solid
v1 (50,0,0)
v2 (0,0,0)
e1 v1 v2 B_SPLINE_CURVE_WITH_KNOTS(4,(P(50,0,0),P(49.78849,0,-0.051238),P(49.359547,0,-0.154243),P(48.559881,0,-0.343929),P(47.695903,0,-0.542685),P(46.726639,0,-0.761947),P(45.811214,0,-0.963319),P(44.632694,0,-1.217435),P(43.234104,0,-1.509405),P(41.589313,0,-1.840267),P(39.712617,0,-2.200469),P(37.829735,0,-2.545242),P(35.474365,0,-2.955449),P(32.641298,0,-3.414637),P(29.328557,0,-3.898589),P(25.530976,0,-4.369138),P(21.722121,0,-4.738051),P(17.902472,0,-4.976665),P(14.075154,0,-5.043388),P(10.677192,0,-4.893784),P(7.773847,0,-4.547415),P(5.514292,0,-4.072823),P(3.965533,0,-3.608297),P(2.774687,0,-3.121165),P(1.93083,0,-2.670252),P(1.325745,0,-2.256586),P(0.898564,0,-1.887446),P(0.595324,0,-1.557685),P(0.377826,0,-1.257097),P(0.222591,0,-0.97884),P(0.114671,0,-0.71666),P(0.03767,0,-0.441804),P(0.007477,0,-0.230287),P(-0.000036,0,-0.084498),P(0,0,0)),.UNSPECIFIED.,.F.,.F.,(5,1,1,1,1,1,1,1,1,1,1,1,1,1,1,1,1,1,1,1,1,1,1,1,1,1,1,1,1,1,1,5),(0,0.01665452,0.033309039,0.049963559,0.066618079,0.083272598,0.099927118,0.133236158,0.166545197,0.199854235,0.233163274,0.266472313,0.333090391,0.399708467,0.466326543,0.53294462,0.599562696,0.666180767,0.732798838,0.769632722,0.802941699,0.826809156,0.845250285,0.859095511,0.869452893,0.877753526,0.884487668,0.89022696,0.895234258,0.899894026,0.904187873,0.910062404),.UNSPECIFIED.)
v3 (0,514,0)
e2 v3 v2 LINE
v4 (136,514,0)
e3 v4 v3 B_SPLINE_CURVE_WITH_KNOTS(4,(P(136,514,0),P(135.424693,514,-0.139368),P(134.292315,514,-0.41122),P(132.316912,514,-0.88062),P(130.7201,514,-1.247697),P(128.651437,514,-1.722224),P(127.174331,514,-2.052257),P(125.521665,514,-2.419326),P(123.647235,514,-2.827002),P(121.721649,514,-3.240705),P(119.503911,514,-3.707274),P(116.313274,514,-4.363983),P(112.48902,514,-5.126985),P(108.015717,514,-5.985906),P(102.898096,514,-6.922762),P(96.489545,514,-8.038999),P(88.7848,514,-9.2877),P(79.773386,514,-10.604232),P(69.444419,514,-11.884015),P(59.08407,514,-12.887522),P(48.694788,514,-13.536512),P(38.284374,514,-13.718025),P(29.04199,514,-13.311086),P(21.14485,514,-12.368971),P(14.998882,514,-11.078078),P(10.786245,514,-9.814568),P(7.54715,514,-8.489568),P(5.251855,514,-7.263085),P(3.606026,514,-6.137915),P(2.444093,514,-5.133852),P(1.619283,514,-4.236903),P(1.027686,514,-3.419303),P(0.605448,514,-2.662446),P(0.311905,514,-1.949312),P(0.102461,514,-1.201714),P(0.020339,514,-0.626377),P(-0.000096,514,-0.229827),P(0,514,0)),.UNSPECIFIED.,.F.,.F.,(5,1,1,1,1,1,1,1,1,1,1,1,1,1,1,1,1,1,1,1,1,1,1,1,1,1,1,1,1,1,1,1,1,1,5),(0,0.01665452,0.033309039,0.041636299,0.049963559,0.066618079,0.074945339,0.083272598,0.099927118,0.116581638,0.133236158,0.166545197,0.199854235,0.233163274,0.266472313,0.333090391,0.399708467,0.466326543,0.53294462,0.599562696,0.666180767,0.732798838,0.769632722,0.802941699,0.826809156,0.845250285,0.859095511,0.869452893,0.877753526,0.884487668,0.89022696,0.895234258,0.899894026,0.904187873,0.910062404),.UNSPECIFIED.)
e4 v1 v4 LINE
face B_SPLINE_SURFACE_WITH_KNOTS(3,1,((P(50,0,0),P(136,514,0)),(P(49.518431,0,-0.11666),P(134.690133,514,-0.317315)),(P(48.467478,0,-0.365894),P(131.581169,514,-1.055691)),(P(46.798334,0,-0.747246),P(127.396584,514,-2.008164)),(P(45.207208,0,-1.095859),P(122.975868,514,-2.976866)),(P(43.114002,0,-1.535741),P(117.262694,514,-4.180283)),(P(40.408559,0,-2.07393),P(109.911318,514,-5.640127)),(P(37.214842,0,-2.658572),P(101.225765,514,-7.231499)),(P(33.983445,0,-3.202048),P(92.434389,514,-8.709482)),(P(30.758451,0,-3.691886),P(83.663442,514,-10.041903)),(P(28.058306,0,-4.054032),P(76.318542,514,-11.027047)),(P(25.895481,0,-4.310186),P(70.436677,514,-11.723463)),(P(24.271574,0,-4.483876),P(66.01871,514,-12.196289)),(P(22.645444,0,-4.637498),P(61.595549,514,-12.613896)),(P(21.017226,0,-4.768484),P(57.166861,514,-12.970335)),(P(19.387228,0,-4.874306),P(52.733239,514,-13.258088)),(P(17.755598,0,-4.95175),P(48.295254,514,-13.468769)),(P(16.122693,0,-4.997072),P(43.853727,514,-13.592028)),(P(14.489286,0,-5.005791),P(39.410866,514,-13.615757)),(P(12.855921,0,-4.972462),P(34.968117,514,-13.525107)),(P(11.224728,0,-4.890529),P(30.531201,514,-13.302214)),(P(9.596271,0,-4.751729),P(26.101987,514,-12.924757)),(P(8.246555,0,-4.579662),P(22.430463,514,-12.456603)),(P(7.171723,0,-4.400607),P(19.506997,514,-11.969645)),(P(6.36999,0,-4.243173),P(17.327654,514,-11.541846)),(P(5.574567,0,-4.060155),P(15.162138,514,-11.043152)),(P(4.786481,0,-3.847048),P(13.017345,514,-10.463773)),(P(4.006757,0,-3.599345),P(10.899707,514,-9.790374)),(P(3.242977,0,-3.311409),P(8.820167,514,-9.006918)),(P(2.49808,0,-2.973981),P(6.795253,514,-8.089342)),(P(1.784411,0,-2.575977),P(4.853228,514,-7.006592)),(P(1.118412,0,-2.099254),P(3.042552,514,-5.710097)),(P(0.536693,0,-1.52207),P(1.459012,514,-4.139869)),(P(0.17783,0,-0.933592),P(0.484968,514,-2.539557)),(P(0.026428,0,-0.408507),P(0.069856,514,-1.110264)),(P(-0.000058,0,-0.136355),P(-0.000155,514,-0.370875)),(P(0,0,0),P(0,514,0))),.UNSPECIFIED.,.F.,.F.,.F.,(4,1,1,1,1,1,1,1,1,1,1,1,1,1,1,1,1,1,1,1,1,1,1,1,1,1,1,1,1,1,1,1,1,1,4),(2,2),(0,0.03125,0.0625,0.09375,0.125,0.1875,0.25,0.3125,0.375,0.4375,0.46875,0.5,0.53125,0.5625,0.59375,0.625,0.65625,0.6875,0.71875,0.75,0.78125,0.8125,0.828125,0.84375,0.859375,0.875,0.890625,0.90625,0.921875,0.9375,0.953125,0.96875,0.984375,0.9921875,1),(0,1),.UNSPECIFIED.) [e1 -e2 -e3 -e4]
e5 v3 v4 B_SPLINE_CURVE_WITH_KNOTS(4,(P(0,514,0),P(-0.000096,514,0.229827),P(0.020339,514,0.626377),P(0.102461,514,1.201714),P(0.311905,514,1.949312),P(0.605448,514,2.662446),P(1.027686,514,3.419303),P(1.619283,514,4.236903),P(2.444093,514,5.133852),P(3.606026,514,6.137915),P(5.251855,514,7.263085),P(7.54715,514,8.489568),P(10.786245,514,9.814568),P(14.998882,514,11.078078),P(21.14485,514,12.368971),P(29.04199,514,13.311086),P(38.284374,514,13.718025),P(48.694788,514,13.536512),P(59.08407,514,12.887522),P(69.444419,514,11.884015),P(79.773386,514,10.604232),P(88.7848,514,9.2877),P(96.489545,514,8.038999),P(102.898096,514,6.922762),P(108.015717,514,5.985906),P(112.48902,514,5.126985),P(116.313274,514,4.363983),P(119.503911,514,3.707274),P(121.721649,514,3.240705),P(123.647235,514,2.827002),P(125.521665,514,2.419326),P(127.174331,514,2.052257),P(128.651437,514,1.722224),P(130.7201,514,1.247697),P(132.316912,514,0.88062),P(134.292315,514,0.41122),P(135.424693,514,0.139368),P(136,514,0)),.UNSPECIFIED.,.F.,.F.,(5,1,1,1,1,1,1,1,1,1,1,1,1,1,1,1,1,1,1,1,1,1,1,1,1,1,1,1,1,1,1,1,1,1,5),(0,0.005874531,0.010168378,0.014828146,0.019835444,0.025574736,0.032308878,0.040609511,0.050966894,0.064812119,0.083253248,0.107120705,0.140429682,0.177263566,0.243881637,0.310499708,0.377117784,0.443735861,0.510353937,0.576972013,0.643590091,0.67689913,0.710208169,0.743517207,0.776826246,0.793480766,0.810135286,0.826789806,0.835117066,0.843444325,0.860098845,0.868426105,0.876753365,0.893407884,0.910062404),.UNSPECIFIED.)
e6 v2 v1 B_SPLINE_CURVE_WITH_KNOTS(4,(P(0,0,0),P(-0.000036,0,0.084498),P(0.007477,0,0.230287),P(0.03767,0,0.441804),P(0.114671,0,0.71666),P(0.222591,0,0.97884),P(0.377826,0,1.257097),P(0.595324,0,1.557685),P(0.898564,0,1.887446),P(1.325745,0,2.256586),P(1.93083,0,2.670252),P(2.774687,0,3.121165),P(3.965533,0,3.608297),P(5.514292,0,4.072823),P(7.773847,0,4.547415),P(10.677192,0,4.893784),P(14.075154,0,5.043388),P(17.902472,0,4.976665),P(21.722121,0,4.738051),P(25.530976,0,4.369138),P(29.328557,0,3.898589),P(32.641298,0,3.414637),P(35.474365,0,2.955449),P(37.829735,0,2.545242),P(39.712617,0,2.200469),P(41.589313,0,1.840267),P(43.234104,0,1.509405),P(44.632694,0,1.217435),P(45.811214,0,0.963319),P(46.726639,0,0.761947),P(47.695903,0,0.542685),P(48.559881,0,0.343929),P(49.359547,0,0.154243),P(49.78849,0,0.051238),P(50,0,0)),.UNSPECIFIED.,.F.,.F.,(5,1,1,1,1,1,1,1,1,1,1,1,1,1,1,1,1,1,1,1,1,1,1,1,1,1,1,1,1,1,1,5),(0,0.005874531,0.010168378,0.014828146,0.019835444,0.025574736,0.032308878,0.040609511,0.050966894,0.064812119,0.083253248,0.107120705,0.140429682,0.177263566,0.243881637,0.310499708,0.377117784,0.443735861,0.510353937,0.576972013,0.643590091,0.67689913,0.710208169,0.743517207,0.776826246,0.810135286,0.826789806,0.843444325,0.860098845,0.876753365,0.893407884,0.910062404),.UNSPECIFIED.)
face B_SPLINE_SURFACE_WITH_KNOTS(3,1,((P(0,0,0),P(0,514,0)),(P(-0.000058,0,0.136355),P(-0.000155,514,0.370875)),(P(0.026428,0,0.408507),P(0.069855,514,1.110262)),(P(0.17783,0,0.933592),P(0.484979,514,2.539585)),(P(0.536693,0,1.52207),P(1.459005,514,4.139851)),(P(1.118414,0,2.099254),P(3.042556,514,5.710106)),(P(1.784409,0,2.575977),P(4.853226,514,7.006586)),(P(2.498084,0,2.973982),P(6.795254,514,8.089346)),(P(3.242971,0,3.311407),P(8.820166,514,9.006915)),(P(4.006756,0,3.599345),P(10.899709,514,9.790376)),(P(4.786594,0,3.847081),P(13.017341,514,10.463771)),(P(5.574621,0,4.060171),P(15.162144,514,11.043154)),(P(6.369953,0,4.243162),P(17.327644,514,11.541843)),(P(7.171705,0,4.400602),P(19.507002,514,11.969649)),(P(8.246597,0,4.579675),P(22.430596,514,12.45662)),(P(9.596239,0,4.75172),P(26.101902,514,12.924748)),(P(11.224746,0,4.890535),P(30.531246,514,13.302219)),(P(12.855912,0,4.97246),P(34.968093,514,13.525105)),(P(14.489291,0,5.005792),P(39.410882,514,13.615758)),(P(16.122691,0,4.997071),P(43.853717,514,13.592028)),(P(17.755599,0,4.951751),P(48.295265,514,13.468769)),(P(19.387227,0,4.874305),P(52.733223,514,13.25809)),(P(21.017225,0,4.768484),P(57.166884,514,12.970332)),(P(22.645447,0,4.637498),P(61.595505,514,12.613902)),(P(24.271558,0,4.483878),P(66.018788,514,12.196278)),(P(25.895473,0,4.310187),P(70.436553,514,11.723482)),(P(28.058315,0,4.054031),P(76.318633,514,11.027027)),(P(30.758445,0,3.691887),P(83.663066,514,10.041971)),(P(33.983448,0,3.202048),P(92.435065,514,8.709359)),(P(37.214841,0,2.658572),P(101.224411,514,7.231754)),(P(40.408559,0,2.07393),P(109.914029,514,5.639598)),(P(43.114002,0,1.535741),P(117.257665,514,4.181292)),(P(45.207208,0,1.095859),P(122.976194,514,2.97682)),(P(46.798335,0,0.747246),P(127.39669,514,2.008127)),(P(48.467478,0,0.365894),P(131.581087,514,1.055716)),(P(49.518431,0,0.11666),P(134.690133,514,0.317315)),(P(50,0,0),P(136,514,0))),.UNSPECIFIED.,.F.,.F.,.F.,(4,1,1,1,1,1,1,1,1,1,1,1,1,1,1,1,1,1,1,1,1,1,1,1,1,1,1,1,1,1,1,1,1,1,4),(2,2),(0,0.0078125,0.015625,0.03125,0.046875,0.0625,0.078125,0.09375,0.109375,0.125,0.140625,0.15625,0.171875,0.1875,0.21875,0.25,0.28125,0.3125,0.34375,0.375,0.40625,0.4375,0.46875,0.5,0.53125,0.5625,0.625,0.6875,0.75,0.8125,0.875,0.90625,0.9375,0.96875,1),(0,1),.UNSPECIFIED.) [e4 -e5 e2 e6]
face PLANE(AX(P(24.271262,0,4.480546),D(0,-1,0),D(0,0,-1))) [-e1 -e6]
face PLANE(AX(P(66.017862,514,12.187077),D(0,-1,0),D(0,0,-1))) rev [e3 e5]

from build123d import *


with BuildPart() as part:
    # 草图2 → 放样1 section 0
    with BuildSketch(Plane(origin=(0, 0, 0), x_dir=(1, 0, 0), z_dir=(0, 1, 0))):
        with BuildLine():
            add(Edge.make_bspline(
                [(0, 0), (-3.576e-05, 0.084497569), (0.007477499, 0.23028724), (0.037669886, 0.441804118), (0.114670661, 0.716660066), (0.222591162, 0.97883952), (0.377825674, 1.257096948), (0.595324455, 1.557684708), (0.898563756, 1.887445773), (1.325744708, 2.256586438), (1.930829743, 2.670251676), (2.774686528, 3.121164923), (3.965533046, 3.608296591), (5.514291908, 4.072823407), (7.773847203, 4.547414656), (10.677192241, 4.893784098), (14.075153576, 5.04338755), (17.902472455, 4.976664507), (21.722121201, 4.738050775), (25.53097555, 4.369137888), (29.328557123, 3.898589047), (32.64129846, 3.41463723), (35.474365339, 2.955449458), (37.82973495, 2.545241631), (39.71261705, 2.200468958), (41.589312775, 1.840267173), (43.234103544, 1.509405454), (44.632694252, 1.217435308), (45.811213926, 0.963318516), (46.72663907, 0.76194688), (47.69590289, 0.5426851), (48.559880658, 0.343928912), (49.359546604, 0.154242876), (49.788490254, 0.051238236), (50, 0)],
                knots=[0, 0, 0, 0, 0, 0.005874531, 0.010168378, 0.014828146, 0.019835444, 0.025574736, 0.032308878, 0.040609511, 0.050966894, 0.064812119, 0.083253248, 0.107120705, 0.140429682, 0.177263566, 0.243881637, 0.310499708, 0.377117784, 0.443735861, 0.510353937, 0.576972013, 0.643590091, 0.67689913, 0.710208169, 0.743517207, 0.776826246, 0.810135286, 0.826789806, 0.843444325, 0.860098845, 0.876753365, 0.893407884, 0.910062404, 0.910062404, 0.910062404, 0.910062404, 0.910062404], degree=4))
            add(Edge.make_bspline(
                [(0, 0), (-3.576e-05, -0.084497569), (0.007477499, -0.23028724), (0.037669886, -0.441804118), (0.114670661, -0.716660066), (0.222591162, -0.97883952), (0.377825674, -1.257096948), (0.595324455, -1.557684708), (0.898563756, -1.887445773), (1.325744708, -2.256586438), (1.930829743, -2.670251676), (2.774686528, -3.121164923), (3.965533046, -3.608296591), (5.514291908, -4.072823407), (7.773847203, -4.547414656), (10.677192241, -4.893784098), (14.075153576, -5.04338755), (17.902472455, -4.976664507), (21.722121201, -4.738050775), (25.53097555, -4.369137888), (29.328557123, -3.898589047), (32.64129846, -3.41463723), (35.474365339, -2.955449458), (37.82973495, -2.545241631), (39.71261705, -2.200468958), (41.589312775, -1.840267173), (43.234103544, -1.509405454), (44.632694252, -1.217435308), (45.811213926, -0.963318516), (46.72663907, -0.76194688), (47.69590289, -0.5426851), (48.559880658, -0.343928912), (49.359546604, -0.154242876), (49.788490254, -0.051238236), (50, 0)],
                knots=[0, 0, 0, 0, 0, 0.005874531, 0.010168378, 0.014828146, 0.019835444, 0.025574736, 0.032308878, 0.040609511, 0.050966894, 0.064812119, 0.083253248, 0.107120705, 0.140429682, 0.177263566, 0.243881637, 0.310499708, 0.377117784, 0.443735861, 0.510353937, 0.576972013, 0.643590091, 0.67689913, 0.710208169, 0.743517207, 0.776826246, 0.810135286, 0.826789806, 0.843444325, 0.860098845, 0.876753365, 0.893407884, 0.910062404, 0.910062404, 0.910062404, 0.910062404, 0.910062404], degree=4))
        make_face()
    # 草图3 → 放样1 section 1
    with BuildSketch(Plane(origin=(0, 514, 0), x_dir=(1, 0, 0), z_dir=(0, 1, 0))):
        with BuildLine():
            add(Edge.make_bspline(
                [(0, 0), (-9.6239e-05, 0.229826737), (0.020338686, 0.626377201), (0.102461083, 1.201713894), (0.311904811, 1.949311826), (0.60544768, 2.662445554), (1.027685977, 3.419302575), (1.619282695, 4.236902988), (2.444092964, 5.133852215), (3.6060265, 6.137915117), (5.251855264, 7.263084811), (7.547150164, 8.489567998), (10.786245051, 9.814567846), (14.998881946, 11.078077768), (21.144850206, 12.368971283), (29.041989656, 13.311086271), (38.284374304, 13.718024659), (48.694788276, 13.536512137), (59.084069855, 12.887522311), (69.444418675, 11.884014996), (79.773385654, 10.604232473), (88.784800012, 9.287699714), (96.489545481, 8.038999144), (102.898095596, 6.922762194), (108.015717075, 5.985906459), (112.489020463, 5.126984847), (116.313274012, 4.363983128), (119.503911267, 3.707274265), (121.721649175, 3.240705223), (123.647234719, 2.827002442), (125.521665439, 2.41932597), (127.174331301, 2.052257293), (128.651437019, 1.722224062), (130.720100002, 1.247696687), (132.316911758, 0.880619788), (134.292315332, 0.411219701), (135.42469349, 0.139368002), (136, 0)],
                knots=[0, 0, 0, 0, 0, 0.005874531, 0.010168378, 0.014828146, 0.019835444, 0.025574736, 0.032308878, 0.040609511, 0.050966894, 0.064812119, 0.083253248, 0.107120705, 0.140429682, 0.177263566, 0.243881637, 0.310499708, 0.377117784, 0.443735861, 0.510353937, 0.576972013, 0.643590091, 0.67689913, 0.710208169, 0.743517207, 0.776826246, 0.793480766, 0.810135286, 0.826789806, 0.835117066, 0.843444325, 0.860098845, 0.868426105, 0.876753365, 0.893407884, 0.910062404, 0.910062404, 0.910062404, 0.910062404, 0.910062404], degree=4))
            add(Edge.make_bspline(
                [(0, 0), (-9.6239e-05, -0.229826737), (0.020338686, -0.626377201), (0.102461083, -1.201713894), (0.311904811, -1.949311826), (0.60544768, -2.662445554), (1.027685977, -3.419302575), (1.619282695, -4.236902988), (2.444092964, -5.133852215), (3.6060265, -6.137915117), (5.251855264, -7.263084811), (7.547150164, -8.489567998), (10.786245051, -9.814567846), (14.998881946, -11.078077768), (21.144850206, -12.368971283), (29.041989656, -13.311086271), (38.284374304, -13.718024659), (48.694788276, -13.536512137), (59.084069855, -12.887522311), (69.444418675, -11.884014996), (79.773385654, -10.604232473), (88.784800012, -9.287699714), (96.489545481, -8.038999144), (102.898095596, -6.922762194), (108.015717075, -5.985906459), (112.489020463, -5.126984847), (116.313274012, -4.363983128), (119.503911267, -3.707274265), (121.721649175, -3.240705223), (123.647234719, -2.827002442), (125.521665439, -2.41932597), (127.174331301, -2.052257293), (128.651437019, -1.722224062), (130.720100002, -1.247696687), (132.316911758, -0.880619788), (134.292315332, -0.411219701), (135.42469349, -0.139368002), (136, 0)],
                knots=[0, 0, 0, 0, 0, 0.005874531, 0.010168378, 0.014828146, 0.019835444, 0.025574736, 0.032308878, 0.040609511, 0.050966894, 0.064812119, 0.083253248, 0.107120705, 0.140429682, 0.177263566, 0.243881637, 0.310499708, 0.377117784, 0.443735861, 0.510353937, 0.576972013, 0.643590091, 0.67689913, 0.710208169, 0.743517207, 0.776826246, 0.793480766, 0.810135286, 0.826789806, 0.835117066, 0.843444325, 0.860098845, 0.868426105, 0.876753365, 0.893407884, 0.910062404, 0.910062404, 0.910062404, 0.910062404, 0.910062404], degree=4))
        make_face()
    loft()


solid = part.part
